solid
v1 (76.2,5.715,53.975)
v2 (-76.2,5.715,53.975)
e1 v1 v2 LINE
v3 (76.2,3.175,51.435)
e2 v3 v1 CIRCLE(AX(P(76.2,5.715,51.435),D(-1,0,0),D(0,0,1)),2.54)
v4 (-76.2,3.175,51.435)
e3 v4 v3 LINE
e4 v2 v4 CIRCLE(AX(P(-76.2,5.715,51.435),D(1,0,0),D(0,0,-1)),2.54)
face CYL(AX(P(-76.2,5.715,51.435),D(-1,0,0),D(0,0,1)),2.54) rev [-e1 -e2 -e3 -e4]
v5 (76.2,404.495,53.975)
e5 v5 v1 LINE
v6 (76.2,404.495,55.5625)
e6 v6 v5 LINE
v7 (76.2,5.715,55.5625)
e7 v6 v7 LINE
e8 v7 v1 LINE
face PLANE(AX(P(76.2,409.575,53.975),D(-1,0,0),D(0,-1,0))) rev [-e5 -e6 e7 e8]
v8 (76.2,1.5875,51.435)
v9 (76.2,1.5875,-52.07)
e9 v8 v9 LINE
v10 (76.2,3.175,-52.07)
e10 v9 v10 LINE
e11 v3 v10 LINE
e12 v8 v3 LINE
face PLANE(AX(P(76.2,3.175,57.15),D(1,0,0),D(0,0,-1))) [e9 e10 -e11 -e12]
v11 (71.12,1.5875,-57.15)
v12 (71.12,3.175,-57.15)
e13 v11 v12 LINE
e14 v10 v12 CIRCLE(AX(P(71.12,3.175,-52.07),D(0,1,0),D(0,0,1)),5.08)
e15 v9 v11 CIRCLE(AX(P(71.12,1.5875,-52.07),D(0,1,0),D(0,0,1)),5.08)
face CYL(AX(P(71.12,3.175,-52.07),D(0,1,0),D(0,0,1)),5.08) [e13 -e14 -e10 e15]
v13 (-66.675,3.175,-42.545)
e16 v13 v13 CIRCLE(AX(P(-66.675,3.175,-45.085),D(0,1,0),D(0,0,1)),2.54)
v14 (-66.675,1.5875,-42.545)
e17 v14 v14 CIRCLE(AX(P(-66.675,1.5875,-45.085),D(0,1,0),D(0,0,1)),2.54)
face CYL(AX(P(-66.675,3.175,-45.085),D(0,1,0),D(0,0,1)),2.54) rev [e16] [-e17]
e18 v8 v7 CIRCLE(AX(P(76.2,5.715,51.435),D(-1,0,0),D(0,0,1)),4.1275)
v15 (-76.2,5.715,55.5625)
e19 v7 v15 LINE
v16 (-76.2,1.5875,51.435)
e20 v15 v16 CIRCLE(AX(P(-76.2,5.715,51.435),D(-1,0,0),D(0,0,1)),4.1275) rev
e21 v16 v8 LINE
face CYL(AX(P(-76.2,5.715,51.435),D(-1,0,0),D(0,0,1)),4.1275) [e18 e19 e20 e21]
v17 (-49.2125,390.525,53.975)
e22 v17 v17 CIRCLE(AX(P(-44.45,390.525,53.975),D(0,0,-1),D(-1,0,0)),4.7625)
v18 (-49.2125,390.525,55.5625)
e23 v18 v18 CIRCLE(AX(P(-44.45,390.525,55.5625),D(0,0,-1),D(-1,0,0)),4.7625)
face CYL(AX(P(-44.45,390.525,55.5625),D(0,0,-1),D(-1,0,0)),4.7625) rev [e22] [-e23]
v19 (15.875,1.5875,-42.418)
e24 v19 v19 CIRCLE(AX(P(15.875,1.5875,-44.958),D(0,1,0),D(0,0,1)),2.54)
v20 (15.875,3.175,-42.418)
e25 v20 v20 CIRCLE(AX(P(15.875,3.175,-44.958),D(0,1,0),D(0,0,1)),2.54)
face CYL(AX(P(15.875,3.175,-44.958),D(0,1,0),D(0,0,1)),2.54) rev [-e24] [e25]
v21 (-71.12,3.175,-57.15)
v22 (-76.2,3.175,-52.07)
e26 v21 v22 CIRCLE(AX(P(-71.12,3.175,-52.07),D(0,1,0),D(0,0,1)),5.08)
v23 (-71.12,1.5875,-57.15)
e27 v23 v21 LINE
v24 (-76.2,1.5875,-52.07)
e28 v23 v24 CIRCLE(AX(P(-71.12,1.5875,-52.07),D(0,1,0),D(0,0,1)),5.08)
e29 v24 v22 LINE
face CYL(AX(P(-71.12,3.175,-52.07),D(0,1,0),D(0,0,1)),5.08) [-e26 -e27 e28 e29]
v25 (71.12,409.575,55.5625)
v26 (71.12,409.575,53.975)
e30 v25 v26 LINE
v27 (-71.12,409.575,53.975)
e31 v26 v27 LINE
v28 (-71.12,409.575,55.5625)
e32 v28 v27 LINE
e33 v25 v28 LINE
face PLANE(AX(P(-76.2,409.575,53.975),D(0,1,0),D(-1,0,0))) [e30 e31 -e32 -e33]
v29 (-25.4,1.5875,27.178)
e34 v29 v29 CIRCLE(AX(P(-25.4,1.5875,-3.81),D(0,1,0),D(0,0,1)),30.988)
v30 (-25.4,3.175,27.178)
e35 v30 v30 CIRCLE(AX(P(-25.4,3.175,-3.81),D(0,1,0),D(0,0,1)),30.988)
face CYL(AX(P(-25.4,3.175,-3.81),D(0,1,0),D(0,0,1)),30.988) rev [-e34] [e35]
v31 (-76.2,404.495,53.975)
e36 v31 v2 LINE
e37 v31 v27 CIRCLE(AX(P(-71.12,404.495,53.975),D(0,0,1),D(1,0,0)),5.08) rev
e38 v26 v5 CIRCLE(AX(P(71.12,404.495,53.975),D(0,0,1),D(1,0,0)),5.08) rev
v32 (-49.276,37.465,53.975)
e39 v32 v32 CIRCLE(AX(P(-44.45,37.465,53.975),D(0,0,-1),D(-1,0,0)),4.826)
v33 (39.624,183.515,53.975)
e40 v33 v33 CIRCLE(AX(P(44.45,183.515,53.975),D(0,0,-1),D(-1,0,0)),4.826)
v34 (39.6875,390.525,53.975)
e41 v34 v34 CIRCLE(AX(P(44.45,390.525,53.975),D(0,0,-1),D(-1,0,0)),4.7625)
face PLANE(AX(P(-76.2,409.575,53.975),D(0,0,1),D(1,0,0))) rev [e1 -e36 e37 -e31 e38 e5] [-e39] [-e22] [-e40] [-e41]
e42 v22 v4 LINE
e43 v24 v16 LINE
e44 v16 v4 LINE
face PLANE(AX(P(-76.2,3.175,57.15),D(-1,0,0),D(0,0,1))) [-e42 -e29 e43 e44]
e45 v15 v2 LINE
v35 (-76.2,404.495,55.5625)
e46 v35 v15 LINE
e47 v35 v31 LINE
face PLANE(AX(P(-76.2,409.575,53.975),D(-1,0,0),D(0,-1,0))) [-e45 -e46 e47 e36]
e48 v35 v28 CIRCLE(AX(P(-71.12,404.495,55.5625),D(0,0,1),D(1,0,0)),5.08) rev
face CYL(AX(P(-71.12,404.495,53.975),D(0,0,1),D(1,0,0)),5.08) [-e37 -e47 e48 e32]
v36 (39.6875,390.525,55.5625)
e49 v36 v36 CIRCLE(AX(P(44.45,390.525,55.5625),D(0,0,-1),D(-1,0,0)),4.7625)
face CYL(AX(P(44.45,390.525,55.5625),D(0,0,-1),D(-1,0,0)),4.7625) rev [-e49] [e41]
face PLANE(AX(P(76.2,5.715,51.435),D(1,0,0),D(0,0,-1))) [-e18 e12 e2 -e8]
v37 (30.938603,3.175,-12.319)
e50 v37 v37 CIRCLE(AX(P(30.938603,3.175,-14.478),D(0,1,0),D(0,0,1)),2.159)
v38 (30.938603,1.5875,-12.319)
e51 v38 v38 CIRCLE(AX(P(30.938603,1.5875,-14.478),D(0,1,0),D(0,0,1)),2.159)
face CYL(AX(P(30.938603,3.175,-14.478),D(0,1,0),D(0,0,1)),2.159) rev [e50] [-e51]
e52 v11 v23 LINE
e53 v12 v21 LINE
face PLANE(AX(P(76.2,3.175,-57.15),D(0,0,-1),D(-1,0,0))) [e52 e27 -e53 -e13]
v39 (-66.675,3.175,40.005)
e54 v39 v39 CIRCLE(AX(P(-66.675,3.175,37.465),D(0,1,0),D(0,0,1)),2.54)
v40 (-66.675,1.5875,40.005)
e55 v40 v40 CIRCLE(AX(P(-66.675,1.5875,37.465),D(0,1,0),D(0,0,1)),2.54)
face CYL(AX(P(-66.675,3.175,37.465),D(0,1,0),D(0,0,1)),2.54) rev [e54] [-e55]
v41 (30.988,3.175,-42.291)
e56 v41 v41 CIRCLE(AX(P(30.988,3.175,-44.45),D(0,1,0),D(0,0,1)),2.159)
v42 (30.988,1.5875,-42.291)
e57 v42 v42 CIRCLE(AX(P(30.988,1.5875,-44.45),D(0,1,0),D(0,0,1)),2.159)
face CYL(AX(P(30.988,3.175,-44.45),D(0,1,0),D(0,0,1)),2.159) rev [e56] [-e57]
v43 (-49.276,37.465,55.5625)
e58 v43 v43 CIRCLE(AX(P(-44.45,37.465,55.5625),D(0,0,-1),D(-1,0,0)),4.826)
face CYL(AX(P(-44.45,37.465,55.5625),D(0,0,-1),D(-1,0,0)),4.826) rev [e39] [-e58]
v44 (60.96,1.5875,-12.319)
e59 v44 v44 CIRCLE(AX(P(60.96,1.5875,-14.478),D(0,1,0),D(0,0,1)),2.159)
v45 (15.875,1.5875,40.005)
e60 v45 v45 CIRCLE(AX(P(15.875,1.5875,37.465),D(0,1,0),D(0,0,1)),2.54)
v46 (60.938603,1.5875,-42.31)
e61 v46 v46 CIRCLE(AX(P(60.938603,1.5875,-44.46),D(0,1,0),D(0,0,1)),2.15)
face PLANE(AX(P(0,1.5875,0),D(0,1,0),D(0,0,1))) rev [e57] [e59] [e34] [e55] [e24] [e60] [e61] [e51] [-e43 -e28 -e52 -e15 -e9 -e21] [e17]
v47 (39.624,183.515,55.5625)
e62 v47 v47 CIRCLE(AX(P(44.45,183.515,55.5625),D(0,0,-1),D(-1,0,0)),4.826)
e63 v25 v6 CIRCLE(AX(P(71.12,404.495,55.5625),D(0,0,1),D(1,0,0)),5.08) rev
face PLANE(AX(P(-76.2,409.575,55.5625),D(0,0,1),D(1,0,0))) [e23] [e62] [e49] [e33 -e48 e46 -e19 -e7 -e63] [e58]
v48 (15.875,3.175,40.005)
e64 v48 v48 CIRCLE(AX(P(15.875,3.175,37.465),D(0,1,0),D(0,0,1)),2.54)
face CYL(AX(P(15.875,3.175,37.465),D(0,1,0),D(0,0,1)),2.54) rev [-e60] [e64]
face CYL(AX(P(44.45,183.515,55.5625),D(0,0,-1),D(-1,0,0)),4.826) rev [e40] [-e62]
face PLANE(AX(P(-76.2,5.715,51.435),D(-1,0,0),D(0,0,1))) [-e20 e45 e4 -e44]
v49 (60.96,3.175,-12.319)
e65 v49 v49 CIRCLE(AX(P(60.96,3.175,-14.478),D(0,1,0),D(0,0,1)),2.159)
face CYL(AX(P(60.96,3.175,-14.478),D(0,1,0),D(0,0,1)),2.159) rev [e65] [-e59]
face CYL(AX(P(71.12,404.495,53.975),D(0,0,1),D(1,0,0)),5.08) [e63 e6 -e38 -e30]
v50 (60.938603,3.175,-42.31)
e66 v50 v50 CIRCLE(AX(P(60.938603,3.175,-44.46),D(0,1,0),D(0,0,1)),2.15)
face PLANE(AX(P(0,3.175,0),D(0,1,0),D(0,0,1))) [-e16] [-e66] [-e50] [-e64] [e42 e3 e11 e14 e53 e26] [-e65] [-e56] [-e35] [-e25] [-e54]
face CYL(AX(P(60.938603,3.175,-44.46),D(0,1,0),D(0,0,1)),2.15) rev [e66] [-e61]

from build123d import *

# Parameters (mm, degrees)
SKETCH1_W            = 152.4
SKETCH1_H            = 114.3
BOSS_EXTRUDE1_DEPTH  = 3.175
SKETCH2_W            = 152.4
SKETCH2_H            = 3.175
BOSS_EXTRUDE2_DEPTH  = 406.4
FILLET1_R            = 2.54
FILLET2_R            = 5.08
SKETCH3_R            = 30.988
SKETCH3_R_2          = 2.54
SKETCH3_R_3          = 2.159
SKETCH3_R_4          = 2.15
CUT_EXTRUDE1_DEPTH   = 418.41289211
CONVERT_SOLID1_START = -76.2
CONVERT_SOLID1_DEPTH = 152.4
SKETCH4_R            = 4.7625
SKETCH4_R_2          = 4.826
CUT_EXTRUDE2_DEPTH   = 432.169208374


# Read off the part's stored shape, not the designer's step: Convert-Solid1
with BuildPart() as part:
    # Sketch1 → Boss-Extrude1 (new body)
    with BuildSketch(Plane(origin=(0, 0, 0), x_dir=(1, 0, 0), z_dir=(0, 1, 0))):
        Rectangle(SKETCH1_W, SKETCH1_H)
    extrude(amount=BOSS_EXTRUDE1_DEPTH)

    # Sketch2 → Boss-Extrude2 (add)
    with BuildSketch(Plane(origin=(0, 3.175, 0), x_dir=(1, 0, 0), z_dir=(0, 1, 0))):
        with Locations((0, -55.5625)):
            Rectangle(SKETCH2_W, SKETCH2_H)
    extrude(amount=BOSS_EXTRUDE2_DEPTH)

    # Fillet1
    fillet1_edges = [part.edges().sort_by_distance(p)[0] for p in [
        (0, 3.175, 53.975),
        (0, 0, 57.15),
    ]]
    fillet(fillet1_edges, radius=FILLET1_R)

    # Fillet2
    fillet2_edges = [part.edges().sort_by_distance(p)[0] for p in [
        (-76.2, 409.575, 55.5625),
        (76.2, 409.575, 55.5625),
        (-76.2, 1.5875, -57.15),
        (76.2, 1.5875, -57.15),
    ]]
    fillet(fillet2_edges, radius=FILLET2_R)

    # Sketch3 → Cut-Extrude1 (cut, through all)
    with BuildSketch(Plane(origin=(0, 3.175, 0), x_dir=(1, 0, 0), z_dir=(0, 1, 0))):
        with Locations(Location((-25.4, 3.81, 0), (0, 0, 270))):
            Circle(SKETCH3_R)
        with Locations(Location((15.875, 44.958, 0), (0, 0, 270))):
            Circle(SKETCH3_R_2)
        with Locations(Location((-66.675, -37.465, 0), (0, 0, 270))):
            Circle(SKETCH3_R_2)
        with Locations(Location((15.875, -37.465, 0), (0, 0, 270))):
            Circle(SKETCH3_R_2)
        with Locations(Location((30.988, 44.45, 0), (0, 0, 270))):
            Circle(SKETCH3_R_3)
        with Locations(Location((60.93860251, 44.46, 0), (0, 0, 270))):
            Circle(SKETCH3_R_4)
        with Locations(Location((60.96, 14.478, 0), (0, 0, 270))):
            Circle(SKETCH3_R_3)
        with Locations(Location((30.93860251, 14.478, 0), (0, 0, 270))):
            Circle(SKETCH3_R_3)
        with Locations(Location((-66.675, 45.085, 0), (0, 0, 270))):
            Circle(SKETCH3_R_2)
    extrude(amount=-CUT_EXTRUDE1_DEPTH, mode=Mode.SUBTRACT)

    # Convert-Solid1 outline → Convert-Solid1 (cut)
    with BuildSketch(Plane.YZ.offset(CONVERT_SOLID1_START)):
        with BuildLine():
            Line((1.5875, -57.15), (1.5875, 51.435))
            ThreePointArc((1.5875, 51.435), (2.796416761, 54.353583239), (5.715, 55.5625))
            Line((5.715, 55.5625), (409.575, 55.5625))
            Line((409.575, 55.5625), (409.575, 57.15))
            Line((409.575, 57.15), (2.54, 57.15))
            ThreePointArc((2.54, 57.15), (0.743948776, 56.406051224), (0, 54.61))
            Line((0, 54.61), (0, -57.15))
            Line((0, -57.15), (1.5875, -57.15))
        make_face()
    extrude(amount=CONVERT_SOLID1_DEPTH, mode=Mode.SUBTRACT)

    # Sketch4 → Cut-Extrude2 (cut, through all)
    with BuildSketch(Plane(origin=(0, 0, 53.975), x_dir=(-1, 0, 0), z_dir=(0, 0, -1))):
        with Locations((-44.45, 390.525)):
            Circle(SKETCH4_R)
        with Locations((44.45, 390.525)):
            Circle(SKETCH4_R)
        with Locations((-44.45, 183.515)):
            Circle(SKETCH4_R_2)
        with Locations((44.45, 37.465)):
            Circle(SKETCH4_R_2)
    extrude(amount=-CUT_EXTRUDE2_DEPTH, mode=Mode.SUBTRACT)


solid = part.part
